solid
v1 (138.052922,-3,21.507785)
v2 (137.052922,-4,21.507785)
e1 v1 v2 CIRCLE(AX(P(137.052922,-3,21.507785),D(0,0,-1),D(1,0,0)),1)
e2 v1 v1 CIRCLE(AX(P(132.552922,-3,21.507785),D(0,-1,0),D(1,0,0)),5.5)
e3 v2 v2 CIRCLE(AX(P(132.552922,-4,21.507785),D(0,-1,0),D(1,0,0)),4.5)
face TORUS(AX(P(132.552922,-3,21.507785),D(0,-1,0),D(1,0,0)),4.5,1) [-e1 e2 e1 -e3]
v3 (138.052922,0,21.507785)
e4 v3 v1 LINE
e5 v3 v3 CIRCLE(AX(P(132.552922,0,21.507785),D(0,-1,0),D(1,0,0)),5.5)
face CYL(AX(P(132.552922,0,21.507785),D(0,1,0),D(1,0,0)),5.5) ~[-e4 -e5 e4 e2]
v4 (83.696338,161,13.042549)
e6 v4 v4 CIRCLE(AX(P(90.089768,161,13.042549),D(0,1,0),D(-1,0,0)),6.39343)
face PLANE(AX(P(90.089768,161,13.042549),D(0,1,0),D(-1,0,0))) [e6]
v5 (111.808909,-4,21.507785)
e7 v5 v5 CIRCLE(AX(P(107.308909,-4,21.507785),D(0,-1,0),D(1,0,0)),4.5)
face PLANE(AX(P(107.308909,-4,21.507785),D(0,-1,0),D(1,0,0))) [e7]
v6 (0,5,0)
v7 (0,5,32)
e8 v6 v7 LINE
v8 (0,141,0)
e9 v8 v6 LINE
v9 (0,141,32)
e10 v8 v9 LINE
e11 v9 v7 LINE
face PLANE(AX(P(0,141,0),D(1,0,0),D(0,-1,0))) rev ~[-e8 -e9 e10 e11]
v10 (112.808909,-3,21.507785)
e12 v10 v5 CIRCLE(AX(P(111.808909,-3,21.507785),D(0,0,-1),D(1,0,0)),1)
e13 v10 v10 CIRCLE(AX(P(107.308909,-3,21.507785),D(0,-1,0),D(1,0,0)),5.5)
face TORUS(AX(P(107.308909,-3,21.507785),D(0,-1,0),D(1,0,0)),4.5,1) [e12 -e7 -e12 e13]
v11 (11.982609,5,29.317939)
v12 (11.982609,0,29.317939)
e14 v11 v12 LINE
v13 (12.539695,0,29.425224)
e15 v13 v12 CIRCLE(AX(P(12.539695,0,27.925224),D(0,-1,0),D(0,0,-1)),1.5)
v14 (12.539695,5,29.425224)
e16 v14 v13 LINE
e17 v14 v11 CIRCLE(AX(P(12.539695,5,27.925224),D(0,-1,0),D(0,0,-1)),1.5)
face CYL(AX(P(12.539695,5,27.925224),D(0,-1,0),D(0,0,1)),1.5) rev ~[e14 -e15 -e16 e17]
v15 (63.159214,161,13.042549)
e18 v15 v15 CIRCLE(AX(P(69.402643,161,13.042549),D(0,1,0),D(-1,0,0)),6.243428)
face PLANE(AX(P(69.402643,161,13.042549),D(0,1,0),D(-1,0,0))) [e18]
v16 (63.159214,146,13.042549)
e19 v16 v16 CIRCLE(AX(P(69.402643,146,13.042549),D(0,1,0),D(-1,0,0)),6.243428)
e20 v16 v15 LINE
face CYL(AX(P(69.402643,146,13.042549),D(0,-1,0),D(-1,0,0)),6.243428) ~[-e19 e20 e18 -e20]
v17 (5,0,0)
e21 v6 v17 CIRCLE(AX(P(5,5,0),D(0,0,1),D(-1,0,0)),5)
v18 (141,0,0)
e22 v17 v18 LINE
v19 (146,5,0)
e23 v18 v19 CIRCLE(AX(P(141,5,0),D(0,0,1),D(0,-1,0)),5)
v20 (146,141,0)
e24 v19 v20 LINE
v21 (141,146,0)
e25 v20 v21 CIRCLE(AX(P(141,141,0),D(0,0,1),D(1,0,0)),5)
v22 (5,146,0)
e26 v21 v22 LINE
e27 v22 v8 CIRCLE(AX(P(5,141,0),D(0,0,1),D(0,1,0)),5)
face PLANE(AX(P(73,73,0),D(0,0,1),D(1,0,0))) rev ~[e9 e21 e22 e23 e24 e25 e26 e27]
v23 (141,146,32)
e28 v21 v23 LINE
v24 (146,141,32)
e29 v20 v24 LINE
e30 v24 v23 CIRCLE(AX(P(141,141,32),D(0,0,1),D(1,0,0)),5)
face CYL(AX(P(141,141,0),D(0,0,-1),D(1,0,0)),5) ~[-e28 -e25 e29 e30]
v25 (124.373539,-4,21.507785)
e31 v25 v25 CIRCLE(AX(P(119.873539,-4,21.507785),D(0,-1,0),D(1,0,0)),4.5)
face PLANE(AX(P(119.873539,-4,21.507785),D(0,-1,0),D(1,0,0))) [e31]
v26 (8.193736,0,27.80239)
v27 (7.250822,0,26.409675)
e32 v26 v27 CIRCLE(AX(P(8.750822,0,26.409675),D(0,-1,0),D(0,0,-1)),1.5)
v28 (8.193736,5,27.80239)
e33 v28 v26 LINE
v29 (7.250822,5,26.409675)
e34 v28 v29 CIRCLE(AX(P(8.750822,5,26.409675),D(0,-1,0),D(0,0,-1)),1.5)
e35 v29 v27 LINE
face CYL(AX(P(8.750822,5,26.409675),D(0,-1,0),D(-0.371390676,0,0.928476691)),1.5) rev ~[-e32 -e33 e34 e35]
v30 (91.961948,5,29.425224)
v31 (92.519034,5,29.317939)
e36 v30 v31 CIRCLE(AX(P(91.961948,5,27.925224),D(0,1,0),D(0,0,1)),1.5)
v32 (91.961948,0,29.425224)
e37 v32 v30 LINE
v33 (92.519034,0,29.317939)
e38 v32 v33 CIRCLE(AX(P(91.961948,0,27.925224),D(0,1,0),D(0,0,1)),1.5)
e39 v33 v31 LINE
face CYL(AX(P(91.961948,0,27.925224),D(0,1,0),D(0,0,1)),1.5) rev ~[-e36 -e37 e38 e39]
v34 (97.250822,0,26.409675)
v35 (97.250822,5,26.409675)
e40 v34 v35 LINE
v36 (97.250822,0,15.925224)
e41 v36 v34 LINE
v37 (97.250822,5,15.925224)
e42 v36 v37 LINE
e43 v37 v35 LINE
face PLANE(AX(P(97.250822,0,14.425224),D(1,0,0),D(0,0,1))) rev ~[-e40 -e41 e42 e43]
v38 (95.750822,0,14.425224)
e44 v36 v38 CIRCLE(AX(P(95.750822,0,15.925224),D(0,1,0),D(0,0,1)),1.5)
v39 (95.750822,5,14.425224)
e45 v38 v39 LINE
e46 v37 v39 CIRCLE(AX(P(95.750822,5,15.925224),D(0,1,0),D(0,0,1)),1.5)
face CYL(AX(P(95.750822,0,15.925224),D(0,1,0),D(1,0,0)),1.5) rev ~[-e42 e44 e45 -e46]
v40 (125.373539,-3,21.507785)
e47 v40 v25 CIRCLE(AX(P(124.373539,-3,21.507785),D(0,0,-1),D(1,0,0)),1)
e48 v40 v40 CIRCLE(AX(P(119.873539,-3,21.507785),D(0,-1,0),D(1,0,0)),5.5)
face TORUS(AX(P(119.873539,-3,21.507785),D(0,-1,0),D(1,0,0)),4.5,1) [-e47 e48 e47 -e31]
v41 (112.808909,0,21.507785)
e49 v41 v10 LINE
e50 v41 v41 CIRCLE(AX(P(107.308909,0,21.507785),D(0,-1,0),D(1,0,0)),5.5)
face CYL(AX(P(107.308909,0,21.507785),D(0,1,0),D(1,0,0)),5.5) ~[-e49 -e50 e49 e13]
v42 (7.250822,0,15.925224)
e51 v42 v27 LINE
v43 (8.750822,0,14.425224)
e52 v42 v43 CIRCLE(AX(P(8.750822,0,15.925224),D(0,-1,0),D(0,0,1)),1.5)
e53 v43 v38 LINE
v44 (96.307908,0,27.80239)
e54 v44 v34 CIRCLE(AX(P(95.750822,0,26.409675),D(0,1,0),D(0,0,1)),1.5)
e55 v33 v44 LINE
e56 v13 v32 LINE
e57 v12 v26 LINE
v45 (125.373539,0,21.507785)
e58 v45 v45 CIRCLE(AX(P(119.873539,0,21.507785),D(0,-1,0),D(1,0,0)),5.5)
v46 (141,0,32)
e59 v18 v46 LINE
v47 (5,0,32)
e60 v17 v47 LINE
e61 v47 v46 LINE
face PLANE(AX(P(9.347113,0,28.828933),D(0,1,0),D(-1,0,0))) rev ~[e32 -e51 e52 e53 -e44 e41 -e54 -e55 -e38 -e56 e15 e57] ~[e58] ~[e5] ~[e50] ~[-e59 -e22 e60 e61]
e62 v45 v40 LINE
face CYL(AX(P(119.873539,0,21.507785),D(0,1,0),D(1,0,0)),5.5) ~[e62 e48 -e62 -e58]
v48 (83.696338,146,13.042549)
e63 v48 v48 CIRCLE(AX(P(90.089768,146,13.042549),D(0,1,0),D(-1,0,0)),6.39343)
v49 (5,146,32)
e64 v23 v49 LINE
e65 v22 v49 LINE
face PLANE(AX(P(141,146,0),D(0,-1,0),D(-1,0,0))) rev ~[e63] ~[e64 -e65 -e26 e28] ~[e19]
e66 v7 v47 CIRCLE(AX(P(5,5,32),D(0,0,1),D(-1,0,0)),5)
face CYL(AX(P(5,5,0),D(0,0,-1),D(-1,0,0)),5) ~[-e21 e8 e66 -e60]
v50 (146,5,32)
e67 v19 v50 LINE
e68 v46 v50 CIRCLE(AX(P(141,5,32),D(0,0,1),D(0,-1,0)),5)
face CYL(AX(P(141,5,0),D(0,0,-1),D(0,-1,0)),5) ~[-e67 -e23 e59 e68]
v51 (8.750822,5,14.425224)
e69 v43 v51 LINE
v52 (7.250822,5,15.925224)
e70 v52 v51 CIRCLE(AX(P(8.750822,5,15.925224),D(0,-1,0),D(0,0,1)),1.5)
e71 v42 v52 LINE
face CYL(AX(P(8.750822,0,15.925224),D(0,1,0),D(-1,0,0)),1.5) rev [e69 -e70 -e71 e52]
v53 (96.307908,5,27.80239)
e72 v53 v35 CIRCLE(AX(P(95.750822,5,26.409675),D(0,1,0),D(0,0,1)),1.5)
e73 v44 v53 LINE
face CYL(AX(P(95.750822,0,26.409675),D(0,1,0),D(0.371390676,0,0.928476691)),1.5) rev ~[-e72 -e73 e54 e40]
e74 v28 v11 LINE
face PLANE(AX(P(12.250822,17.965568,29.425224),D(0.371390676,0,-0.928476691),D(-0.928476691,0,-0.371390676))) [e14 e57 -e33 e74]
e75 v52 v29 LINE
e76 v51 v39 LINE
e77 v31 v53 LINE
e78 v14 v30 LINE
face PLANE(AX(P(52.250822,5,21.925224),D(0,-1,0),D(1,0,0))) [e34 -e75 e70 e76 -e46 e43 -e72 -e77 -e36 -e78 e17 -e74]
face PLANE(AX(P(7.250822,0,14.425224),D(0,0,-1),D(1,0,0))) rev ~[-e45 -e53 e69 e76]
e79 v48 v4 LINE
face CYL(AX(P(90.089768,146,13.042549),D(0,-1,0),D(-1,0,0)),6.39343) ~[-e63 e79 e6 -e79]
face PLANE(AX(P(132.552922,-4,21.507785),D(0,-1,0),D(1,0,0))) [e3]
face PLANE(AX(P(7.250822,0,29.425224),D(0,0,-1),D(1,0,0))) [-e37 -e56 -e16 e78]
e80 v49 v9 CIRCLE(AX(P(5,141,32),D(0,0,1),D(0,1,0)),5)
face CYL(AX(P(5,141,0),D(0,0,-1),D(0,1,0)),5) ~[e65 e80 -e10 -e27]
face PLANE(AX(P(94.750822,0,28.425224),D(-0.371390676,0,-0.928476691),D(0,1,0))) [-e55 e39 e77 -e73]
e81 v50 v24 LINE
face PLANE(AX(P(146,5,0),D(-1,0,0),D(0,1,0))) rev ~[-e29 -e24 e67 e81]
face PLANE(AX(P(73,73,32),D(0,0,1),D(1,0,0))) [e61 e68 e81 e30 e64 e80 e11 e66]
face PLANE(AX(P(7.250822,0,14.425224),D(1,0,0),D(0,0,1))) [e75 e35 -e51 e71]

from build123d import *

# Parameters (mm, degrees)
F1_DEPTH    = 32
F2_R        = 5.5
F3_DEPTH    = 4
F4_R        = 1
F2_W        = 90
F2_H        = 15
F5_DEPTH    = 5
F6_T1_DEPTH = 17.9655681957
F7_SIZE2    = 2
F7_SIZE     = 5
F8_R        = 1.5
F9_R        = 6.3934301863
F9_R_2      = 6.243428201
F10_DEPTH   = 15


# Not quite as in the source:
# - a fillet or chamfer that OpenCascade refuses, or shapes differently, is made with other operations: its cross-section is extruded or revolved along the edge and cut away or added


with BuildPart() as f1:
    # F0 (on Top) → F1 (new body)
    with BuildSketch(Plane.XY):
        with BuildLine():
            ThreePointArc((0, 5), (1.4644660941, 1.4644660941), (5, 0))
            Line((5, 0), (141, 0))
            ThreePointArc((141, 0), (144.5355339059, 1.4644660941), (146, 5))
            Line((146, 5), (146, 141))
            ThreePointArc((146, 141), (144.5355339059, 144.5355339059), (141, 146))
            Line((141, 146), (5, 146))
            ThreePointArc((5, 146), (1.4644660941, 144.5355339059), (0, 141))
            Line((0, 141), (0, 5))
        make_face()
    extrude(amount=F1_DEPTH)

    # F2 (on face) → F3 (join)
    with BuildSketch(Plane.XZ):
        with Locations((107.308909297, 21.5077847242)):
            Circle(F2_R)
        with Locations((119.8735386133, 21.5077847242)):
            Circle(F2_R)
        with Locations((132.552921772, 21.5077847242)):
            Circle(F2_R)
    extrude(amount=F3_DEPTH)

    # F4
    f4_edges = [f1.edges().sort_by_distance(p)[0] for p in [
        (101.808909, -4, 21.507785),
        (114.373539, -4, 21.507785),
        (127.052922, -4, 21.507785),
    ]]
    fillet(f4_edges, radius=F4_R)

    # F2 (on face) → F5 (cut)
    with BuildSketch(Plane.XZ):
        with Locations((52.2508216836, 21.9252242893)):
            Rectangle(F2_W, F2_H)
    extrude(amount=-F5_DEPTH, mode=Mode.SUBTRACT)

    # F6: chamfer of 2 x 5 on 1 edges, made by hand

    # F6_s2 → F6_t1 (join)
    with BuildSketch(Plane.XZ.offset(-17.9655681957)):
        Polygon((12.2508216836, 29.4252242893), (7.2508216836, 27.4252242893), (7.2508216836, 29.4252242893), align=None)
    extrude(amount=F6_T1_DEPTH)

    # F7
    f7_edges = [f1.edges().sort_by_distance(p)[0] for p in [
        (97.250822, 2.5, 29.425224),
    ]]
    chamfer(f7_edges, length=F7_SIZE, length2=F7_SIZE2)

    # F8
    f8_edges = [f1.edges().sort_by_distance(p)[0] for p in [
        (92.250822, 2.5, 29.425224),
        (97.250822, 2.5, 27.425224),
        (97.250822, 2.5, 14.425224),
        (7.250822, 2.5, 14.425224),
        (7.250822, 2.5, 27.425224),
        (12.250822, 2.5, 29.425224),
    ]]
    fillet(f8_edges, radius=F8_R)

    # F9 (on face) → F10 (join)
    with BuildSketch(Plane(origin=(0, 146, 0), x_dir=(-1, 0, 0), z_dir=(0, 1, 0))):
        with Locations((-90.0897681713, 13.0425486714)):
            Circle(F9_R)
        with Locations((-69.4026425481, 13.0425486714)):
            Circle(F9_R_2)
    extrude(amount=F10_DEPTH)


solid = f1.part
